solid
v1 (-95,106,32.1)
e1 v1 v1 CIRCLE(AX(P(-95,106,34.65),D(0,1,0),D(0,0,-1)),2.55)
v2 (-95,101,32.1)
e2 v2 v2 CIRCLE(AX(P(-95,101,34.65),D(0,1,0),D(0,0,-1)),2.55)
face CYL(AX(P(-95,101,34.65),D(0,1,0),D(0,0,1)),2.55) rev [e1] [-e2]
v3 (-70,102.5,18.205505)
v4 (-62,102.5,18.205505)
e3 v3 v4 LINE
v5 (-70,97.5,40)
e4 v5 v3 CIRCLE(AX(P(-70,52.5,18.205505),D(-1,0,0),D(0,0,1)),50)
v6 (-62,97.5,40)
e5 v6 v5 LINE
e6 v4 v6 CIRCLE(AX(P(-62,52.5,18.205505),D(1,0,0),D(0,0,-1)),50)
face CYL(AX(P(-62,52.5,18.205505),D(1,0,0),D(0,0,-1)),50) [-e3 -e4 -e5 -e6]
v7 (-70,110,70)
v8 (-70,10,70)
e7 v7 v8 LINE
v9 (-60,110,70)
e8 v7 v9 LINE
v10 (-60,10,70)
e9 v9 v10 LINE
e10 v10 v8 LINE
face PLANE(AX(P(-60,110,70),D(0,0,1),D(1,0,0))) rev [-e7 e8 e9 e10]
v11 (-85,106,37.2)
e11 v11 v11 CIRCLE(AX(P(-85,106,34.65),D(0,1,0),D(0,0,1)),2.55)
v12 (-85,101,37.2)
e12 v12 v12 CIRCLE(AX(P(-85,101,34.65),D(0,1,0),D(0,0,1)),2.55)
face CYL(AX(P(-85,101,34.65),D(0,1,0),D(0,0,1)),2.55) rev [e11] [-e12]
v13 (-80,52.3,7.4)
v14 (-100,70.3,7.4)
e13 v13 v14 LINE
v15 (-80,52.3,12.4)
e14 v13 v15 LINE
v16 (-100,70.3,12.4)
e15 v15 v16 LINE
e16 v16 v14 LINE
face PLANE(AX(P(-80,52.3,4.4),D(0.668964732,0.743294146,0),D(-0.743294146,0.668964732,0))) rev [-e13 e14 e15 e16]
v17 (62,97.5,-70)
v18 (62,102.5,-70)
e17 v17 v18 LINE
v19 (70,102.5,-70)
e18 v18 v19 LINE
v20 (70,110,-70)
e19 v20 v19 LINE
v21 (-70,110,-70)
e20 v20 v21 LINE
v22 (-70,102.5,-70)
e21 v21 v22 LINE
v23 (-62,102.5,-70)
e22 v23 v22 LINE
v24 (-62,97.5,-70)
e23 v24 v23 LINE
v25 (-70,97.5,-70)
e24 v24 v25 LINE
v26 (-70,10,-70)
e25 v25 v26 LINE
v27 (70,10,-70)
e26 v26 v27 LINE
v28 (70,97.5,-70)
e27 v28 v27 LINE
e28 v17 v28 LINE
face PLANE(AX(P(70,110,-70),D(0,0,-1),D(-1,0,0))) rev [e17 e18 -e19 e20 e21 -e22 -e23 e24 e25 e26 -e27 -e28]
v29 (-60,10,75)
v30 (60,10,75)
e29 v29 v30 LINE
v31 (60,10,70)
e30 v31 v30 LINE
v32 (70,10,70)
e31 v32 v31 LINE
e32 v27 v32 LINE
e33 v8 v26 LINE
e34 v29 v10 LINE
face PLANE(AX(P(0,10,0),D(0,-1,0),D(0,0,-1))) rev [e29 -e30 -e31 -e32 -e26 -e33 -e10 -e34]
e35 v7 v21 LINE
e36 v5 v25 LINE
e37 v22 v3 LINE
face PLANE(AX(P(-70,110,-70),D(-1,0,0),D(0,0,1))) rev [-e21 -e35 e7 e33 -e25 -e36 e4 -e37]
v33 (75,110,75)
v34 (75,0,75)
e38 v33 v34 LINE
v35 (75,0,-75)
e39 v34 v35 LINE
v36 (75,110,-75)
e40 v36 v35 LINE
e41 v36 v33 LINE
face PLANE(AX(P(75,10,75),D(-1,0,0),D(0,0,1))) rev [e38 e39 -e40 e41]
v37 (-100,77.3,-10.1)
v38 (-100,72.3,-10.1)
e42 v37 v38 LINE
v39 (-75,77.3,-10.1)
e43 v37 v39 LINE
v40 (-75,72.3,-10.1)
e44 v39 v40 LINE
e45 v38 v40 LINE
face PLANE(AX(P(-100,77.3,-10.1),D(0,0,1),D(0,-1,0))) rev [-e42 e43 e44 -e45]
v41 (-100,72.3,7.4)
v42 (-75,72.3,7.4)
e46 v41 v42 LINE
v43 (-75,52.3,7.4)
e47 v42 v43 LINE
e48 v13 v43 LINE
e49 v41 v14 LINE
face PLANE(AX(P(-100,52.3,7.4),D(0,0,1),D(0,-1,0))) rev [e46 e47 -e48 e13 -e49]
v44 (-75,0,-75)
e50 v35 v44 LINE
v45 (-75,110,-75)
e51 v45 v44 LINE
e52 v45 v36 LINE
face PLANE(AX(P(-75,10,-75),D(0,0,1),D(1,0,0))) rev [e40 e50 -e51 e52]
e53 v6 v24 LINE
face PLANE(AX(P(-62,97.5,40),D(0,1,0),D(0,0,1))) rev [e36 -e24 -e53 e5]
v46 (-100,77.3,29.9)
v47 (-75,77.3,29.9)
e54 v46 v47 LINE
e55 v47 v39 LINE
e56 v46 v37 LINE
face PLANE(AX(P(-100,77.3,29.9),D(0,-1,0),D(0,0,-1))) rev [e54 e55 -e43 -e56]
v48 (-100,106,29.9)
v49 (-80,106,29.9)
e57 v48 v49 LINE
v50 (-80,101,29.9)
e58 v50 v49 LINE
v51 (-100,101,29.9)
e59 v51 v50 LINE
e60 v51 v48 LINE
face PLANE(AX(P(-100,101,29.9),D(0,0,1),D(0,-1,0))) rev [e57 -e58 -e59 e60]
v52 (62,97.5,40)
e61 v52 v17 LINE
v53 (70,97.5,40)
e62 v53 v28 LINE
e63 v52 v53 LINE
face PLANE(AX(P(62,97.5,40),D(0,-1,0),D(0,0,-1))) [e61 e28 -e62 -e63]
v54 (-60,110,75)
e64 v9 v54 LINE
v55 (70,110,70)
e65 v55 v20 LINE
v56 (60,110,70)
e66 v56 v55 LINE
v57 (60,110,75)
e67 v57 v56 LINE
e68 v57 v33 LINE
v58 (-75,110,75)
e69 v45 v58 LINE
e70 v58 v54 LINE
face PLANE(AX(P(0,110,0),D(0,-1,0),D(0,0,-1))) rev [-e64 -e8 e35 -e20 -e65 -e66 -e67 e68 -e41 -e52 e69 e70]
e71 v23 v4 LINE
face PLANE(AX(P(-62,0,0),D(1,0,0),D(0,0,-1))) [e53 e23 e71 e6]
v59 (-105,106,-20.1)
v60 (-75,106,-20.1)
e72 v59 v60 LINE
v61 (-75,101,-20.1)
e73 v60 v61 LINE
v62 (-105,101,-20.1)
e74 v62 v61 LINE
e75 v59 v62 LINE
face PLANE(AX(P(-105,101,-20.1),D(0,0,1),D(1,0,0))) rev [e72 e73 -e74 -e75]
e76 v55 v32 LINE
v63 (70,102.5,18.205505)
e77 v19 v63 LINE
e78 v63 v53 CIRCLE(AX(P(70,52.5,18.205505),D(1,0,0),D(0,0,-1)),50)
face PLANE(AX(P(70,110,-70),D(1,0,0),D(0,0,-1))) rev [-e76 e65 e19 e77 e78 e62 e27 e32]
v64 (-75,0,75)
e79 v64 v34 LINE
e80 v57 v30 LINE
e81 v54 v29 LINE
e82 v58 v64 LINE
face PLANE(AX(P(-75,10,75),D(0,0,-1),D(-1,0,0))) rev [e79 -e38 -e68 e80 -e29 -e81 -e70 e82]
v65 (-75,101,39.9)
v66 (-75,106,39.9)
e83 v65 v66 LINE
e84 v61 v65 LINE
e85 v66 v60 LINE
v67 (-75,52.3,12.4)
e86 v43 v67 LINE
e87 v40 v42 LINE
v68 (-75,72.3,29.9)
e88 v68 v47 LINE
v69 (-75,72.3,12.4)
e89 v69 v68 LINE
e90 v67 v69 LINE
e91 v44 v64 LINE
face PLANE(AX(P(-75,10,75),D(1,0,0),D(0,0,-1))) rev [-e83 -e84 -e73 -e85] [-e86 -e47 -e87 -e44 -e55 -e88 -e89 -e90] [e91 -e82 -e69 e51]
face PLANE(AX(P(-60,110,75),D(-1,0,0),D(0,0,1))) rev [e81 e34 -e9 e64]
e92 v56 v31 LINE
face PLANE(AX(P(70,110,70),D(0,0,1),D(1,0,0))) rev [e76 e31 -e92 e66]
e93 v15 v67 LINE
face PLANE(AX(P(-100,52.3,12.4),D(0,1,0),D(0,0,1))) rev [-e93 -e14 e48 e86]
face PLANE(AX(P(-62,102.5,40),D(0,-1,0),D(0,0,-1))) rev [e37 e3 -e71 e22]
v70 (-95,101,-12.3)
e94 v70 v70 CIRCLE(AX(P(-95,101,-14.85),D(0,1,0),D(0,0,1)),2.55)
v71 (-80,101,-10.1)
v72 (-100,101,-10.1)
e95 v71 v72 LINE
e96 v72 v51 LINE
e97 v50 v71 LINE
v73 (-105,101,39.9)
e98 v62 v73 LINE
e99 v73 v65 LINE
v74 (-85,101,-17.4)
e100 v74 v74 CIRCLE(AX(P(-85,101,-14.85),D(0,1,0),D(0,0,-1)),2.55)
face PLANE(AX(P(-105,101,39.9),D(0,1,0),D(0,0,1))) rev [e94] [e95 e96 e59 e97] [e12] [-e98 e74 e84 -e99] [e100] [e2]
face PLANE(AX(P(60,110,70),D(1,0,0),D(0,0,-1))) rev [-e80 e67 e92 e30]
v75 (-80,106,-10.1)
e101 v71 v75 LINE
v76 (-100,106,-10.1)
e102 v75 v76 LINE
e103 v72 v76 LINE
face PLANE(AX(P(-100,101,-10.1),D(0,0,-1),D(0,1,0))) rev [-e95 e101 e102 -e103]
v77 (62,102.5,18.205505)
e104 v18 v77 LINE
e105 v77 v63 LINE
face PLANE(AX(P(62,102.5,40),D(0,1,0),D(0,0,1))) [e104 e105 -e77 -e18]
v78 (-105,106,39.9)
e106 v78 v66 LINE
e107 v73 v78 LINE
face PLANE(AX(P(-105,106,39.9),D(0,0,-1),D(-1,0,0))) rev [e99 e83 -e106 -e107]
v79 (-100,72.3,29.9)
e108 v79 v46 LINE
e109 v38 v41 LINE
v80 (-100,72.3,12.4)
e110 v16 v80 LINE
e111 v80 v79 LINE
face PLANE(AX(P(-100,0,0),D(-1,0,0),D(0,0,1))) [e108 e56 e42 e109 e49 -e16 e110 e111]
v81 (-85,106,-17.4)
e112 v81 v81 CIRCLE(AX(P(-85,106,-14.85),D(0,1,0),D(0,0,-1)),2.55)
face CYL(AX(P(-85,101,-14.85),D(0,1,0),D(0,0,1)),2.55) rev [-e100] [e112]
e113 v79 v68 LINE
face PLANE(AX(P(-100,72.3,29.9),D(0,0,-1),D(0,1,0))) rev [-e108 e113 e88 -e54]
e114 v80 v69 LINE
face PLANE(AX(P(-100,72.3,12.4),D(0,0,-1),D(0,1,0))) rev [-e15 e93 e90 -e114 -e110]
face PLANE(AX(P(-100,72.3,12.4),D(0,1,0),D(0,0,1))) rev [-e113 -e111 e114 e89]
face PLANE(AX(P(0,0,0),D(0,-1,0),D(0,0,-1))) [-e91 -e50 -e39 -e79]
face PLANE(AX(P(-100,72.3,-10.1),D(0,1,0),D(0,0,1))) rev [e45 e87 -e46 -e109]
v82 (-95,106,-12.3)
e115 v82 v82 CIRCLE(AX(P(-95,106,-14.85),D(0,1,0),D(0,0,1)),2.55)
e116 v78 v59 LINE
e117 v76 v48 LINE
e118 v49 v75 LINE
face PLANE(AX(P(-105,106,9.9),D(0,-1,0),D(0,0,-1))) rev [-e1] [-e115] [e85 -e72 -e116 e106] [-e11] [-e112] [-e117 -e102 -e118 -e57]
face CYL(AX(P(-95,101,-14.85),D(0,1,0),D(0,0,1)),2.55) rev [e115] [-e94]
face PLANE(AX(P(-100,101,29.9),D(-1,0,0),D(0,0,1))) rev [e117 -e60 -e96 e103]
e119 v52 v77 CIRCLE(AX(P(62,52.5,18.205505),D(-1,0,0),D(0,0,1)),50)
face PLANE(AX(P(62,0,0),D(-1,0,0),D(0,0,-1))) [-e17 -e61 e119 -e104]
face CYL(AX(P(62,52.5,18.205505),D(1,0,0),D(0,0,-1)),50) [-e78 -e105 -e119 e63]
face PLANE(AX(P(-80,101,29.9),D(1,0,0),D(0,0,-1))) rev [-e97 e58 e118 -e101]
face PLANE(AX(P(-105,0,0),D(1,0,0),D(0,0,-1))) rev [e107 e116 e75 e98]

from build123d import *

# Parameters (mm, degrees)
SKETCH1_W           = 150
SKETCH1_H           = 150
BOSS_EXTRUDE1_DEPTH = 10
BOSS_EXTRUDE2_DEPTH = 100
BOSS_EXTRUDE3_DEPTH = 30
SKETCH9_R           = 2.55
SKETCH9_W           = 20
SKETCH9_H           = 40
CUT_EXTRUDE1_DEPTH  = 5
BOSS_EXTRUDE4_DEPTH = 25
SKETCH12_W          = 110
SKETCH12_H          = 5
BOSS_EXTRUDE5_DEPTH = 8
FILLET2_R           = 50
CUT_EXTRUDE3_DEPTH  = 8
BOSS_EXTRUDE6_DEPTH = 18
SKETCH15_W          = 150
SKETCH15_H          = 150
BOSS_EXTRUDE7_DEPTH = 5
SKETCH16_W          = 150
SKETCH16_H          = 23
CUT_EXTRUDE4_DEPTH  = 75


with BuildPart() as part:
    # Sketch1 → Boss-Extrude1 (new body)
    with BuildSketch(Plane(origin=(0, 0, 0), x_dir=(1, 0, 0), z_dir=(0, 1, 0))):
        Rectangle(SKETCH1_W, SKETCH1_H)
    extrude(amount=BOSS_EXTRUDE1_DEPTH)

    # Sketch2 → Boss-Extrude2 (add)
    with BuildSketch(Plane(origin=(0, 10, 0), x_dir=(1, 0, 0), z_dir=(0, 1, 0))):
        Polygon((-75, 75), (75, 75), (75, -75), (60, -75), (60, -70), (70, -70), (70, 70), (-70, 70), (-70, -70), (-60, -70), (-60, -75), (-75, -75), align=None)
    extrude(amount=BOSS_EXTRUDE2_DEPTH)

    # Sketch8 → Boss-Extrude3 (add)
    with BuildSketch(Plane.ZY.offset(75)):
        Polygon((9.9, 106), (39.9, 106), (39.9, 101), (-20.1, 101), (-20.1, 106), align=None)
    extrude(amount=BOSS_EXTRUDE3_DEPTH)

    # Sketch9 → Cut-Extrude1 (cut)
    with BuildSketch(Plane(origin=(0, 106, 0), x_dir=(1, 0, 0), z_dir=(0, 1, 0))):
        with Locations(Location((-95, 14.85, 0), (0, 0, 270))):
            Circle(SKETCH9_R)
        with Locations(Location((-85, 14.85, 0), (0, 0, 90))):
            Circle(SKETCH9_R)
        with Locations(Location((-85, -34.65, 0), (0, 0, 270))):
            Circle(SKETCH9_R)
        with Locations(Location((-95, -34.65, 0), (0, 0, 90))):
            Circle(SKETCH9_R)
        with Locations((-90, -9.9)):
            Rectangle(SKETCH9_W, SKETCH9_H)
    extrude(amount=-CUT_EXTRUDE1_DEPTH, mode=Mode.SUBTRACT)

    # Sketch10 → Boss-Extrude4 (add)
    with BuildSketch(Plane.ZY.offset(75)):
        Polygon((-10.1, 77.3), (-10.1, 72.3), (7.4, 72.3), (7.4, 52.3), (12.4, 52.3), (12.4, 72.3), (29.9, 72.3), (29.9, 77.3), align=None)
    extrude(amount=BOSS_EXTRUDE4_DEPTH)

    # Sketch12 → Boss-Extrude5 (add)
    with BuildSketch(Plane(origin=(-70, 0, 0), x_dir=(0, 0, -1), z_dir=(1, 0, 0))):
        with Locations((15, 100)):
            Rectangle(SKETCH12_W, SKETCH12_H)
    boss_extrude5 = extrude(amount=BOSS_EXTRUDE5_DEPTH)

    # Mirror1: Boss-Extrude5 across plane
    add(boss_extrude5.mirror(Plane(origin=(0, 0, 0), x_dir=(0, 0, 1), z_dir=(1, 0, 0))))

    # Fillet2
    # the kernel refuses this fillet: 50 mm, written as the material it takes off along each edge
    with BuildSketch(Plane(origin=(70, 102.5, 40), x_dir=(0, -1, 0), z_dir=(-1, 0, 0))) as fillet2_piece_1:
        with BuildLine():
            CenterArc((50, -21.794494718), FILLET2_R, 154.158067237, 25.841932763)
            Line((0, -21.794494718), (0, 0))
            Line((0, 0), (5, 0))
        make_face()
    extrude(amount=62.486236794, mode=Mode.SUBTRACT)
    with BuildSketch(Plane(origin=(-70, 102.5, 40), x_dir=(0, 0, -1), z_dir=(1, 0, 0))) as fillet2_piece_2:
        with BuildLine():
            CenterArc((21.794494718, -50), FILLET2_R, 90, 25.841932763)
            Line((0, -5), (0, 0))
            Line((0, 0), (21.794494718, 0))
        make_face()
    extrude(amount=62.486236794, mode=Mode.SUBTRACT)

    # Sketch13 → Cut-Extrude3 (cut)
    with BuildSketch(Plane.XY.offset(12.4)):
        Polygon((-100, 52.3), (-100, 70.3), (-80, 52.3), align=None)
    extrude(amount=-CUT_EXTRUDE3_DEPTH, mode=Mode.SUBTRACT)

    # Sketch14 → Boss-Extrude6 (add)
    with BuildSketch(Plane(origin=(0, 110, 0), x_dir=(1, 0, 0), z_dir=(0, 1, 0))):
        Polygon((-75, -75), (-60, -75), (-60, -70), (-70, -70), (-70, -35), (-75, -35), align=None)
        Polygon((60, -75), (60, -70), (70, -70), (70, 70), (-70, 70), (-70, 65), (-75, 65), (-75, 75), (75, 75), (75, -75), align=None)
    extrude(amount=BOSS_EXTRUDE6_DEPTH)

    # Sketch15 → Boss-Extrude7 (add)
    with BuildSketch(Plane(origin=(0, 128, 0), x_dir=(1, 0, 0), z_dir=(0, 1, 0))):
        Rectangle(SKETCH15_W, SKETCH15_H)
    extrude(amount=BOSS_EXTRUDE7_DEPTH)

    # Sketch16 → Cut-Extrude4 (cut, symmetric)
    with BuildSketch(Plane.XY):
        with Locations((0, 121.5)):
            Rectangle(SKETCH16_W, SKETCH16_H)
    extrude(amount=CUT_EXTRUDE4_DEPTH, both=True, mode=Mode.SUBTRACT)


solid = part.part
